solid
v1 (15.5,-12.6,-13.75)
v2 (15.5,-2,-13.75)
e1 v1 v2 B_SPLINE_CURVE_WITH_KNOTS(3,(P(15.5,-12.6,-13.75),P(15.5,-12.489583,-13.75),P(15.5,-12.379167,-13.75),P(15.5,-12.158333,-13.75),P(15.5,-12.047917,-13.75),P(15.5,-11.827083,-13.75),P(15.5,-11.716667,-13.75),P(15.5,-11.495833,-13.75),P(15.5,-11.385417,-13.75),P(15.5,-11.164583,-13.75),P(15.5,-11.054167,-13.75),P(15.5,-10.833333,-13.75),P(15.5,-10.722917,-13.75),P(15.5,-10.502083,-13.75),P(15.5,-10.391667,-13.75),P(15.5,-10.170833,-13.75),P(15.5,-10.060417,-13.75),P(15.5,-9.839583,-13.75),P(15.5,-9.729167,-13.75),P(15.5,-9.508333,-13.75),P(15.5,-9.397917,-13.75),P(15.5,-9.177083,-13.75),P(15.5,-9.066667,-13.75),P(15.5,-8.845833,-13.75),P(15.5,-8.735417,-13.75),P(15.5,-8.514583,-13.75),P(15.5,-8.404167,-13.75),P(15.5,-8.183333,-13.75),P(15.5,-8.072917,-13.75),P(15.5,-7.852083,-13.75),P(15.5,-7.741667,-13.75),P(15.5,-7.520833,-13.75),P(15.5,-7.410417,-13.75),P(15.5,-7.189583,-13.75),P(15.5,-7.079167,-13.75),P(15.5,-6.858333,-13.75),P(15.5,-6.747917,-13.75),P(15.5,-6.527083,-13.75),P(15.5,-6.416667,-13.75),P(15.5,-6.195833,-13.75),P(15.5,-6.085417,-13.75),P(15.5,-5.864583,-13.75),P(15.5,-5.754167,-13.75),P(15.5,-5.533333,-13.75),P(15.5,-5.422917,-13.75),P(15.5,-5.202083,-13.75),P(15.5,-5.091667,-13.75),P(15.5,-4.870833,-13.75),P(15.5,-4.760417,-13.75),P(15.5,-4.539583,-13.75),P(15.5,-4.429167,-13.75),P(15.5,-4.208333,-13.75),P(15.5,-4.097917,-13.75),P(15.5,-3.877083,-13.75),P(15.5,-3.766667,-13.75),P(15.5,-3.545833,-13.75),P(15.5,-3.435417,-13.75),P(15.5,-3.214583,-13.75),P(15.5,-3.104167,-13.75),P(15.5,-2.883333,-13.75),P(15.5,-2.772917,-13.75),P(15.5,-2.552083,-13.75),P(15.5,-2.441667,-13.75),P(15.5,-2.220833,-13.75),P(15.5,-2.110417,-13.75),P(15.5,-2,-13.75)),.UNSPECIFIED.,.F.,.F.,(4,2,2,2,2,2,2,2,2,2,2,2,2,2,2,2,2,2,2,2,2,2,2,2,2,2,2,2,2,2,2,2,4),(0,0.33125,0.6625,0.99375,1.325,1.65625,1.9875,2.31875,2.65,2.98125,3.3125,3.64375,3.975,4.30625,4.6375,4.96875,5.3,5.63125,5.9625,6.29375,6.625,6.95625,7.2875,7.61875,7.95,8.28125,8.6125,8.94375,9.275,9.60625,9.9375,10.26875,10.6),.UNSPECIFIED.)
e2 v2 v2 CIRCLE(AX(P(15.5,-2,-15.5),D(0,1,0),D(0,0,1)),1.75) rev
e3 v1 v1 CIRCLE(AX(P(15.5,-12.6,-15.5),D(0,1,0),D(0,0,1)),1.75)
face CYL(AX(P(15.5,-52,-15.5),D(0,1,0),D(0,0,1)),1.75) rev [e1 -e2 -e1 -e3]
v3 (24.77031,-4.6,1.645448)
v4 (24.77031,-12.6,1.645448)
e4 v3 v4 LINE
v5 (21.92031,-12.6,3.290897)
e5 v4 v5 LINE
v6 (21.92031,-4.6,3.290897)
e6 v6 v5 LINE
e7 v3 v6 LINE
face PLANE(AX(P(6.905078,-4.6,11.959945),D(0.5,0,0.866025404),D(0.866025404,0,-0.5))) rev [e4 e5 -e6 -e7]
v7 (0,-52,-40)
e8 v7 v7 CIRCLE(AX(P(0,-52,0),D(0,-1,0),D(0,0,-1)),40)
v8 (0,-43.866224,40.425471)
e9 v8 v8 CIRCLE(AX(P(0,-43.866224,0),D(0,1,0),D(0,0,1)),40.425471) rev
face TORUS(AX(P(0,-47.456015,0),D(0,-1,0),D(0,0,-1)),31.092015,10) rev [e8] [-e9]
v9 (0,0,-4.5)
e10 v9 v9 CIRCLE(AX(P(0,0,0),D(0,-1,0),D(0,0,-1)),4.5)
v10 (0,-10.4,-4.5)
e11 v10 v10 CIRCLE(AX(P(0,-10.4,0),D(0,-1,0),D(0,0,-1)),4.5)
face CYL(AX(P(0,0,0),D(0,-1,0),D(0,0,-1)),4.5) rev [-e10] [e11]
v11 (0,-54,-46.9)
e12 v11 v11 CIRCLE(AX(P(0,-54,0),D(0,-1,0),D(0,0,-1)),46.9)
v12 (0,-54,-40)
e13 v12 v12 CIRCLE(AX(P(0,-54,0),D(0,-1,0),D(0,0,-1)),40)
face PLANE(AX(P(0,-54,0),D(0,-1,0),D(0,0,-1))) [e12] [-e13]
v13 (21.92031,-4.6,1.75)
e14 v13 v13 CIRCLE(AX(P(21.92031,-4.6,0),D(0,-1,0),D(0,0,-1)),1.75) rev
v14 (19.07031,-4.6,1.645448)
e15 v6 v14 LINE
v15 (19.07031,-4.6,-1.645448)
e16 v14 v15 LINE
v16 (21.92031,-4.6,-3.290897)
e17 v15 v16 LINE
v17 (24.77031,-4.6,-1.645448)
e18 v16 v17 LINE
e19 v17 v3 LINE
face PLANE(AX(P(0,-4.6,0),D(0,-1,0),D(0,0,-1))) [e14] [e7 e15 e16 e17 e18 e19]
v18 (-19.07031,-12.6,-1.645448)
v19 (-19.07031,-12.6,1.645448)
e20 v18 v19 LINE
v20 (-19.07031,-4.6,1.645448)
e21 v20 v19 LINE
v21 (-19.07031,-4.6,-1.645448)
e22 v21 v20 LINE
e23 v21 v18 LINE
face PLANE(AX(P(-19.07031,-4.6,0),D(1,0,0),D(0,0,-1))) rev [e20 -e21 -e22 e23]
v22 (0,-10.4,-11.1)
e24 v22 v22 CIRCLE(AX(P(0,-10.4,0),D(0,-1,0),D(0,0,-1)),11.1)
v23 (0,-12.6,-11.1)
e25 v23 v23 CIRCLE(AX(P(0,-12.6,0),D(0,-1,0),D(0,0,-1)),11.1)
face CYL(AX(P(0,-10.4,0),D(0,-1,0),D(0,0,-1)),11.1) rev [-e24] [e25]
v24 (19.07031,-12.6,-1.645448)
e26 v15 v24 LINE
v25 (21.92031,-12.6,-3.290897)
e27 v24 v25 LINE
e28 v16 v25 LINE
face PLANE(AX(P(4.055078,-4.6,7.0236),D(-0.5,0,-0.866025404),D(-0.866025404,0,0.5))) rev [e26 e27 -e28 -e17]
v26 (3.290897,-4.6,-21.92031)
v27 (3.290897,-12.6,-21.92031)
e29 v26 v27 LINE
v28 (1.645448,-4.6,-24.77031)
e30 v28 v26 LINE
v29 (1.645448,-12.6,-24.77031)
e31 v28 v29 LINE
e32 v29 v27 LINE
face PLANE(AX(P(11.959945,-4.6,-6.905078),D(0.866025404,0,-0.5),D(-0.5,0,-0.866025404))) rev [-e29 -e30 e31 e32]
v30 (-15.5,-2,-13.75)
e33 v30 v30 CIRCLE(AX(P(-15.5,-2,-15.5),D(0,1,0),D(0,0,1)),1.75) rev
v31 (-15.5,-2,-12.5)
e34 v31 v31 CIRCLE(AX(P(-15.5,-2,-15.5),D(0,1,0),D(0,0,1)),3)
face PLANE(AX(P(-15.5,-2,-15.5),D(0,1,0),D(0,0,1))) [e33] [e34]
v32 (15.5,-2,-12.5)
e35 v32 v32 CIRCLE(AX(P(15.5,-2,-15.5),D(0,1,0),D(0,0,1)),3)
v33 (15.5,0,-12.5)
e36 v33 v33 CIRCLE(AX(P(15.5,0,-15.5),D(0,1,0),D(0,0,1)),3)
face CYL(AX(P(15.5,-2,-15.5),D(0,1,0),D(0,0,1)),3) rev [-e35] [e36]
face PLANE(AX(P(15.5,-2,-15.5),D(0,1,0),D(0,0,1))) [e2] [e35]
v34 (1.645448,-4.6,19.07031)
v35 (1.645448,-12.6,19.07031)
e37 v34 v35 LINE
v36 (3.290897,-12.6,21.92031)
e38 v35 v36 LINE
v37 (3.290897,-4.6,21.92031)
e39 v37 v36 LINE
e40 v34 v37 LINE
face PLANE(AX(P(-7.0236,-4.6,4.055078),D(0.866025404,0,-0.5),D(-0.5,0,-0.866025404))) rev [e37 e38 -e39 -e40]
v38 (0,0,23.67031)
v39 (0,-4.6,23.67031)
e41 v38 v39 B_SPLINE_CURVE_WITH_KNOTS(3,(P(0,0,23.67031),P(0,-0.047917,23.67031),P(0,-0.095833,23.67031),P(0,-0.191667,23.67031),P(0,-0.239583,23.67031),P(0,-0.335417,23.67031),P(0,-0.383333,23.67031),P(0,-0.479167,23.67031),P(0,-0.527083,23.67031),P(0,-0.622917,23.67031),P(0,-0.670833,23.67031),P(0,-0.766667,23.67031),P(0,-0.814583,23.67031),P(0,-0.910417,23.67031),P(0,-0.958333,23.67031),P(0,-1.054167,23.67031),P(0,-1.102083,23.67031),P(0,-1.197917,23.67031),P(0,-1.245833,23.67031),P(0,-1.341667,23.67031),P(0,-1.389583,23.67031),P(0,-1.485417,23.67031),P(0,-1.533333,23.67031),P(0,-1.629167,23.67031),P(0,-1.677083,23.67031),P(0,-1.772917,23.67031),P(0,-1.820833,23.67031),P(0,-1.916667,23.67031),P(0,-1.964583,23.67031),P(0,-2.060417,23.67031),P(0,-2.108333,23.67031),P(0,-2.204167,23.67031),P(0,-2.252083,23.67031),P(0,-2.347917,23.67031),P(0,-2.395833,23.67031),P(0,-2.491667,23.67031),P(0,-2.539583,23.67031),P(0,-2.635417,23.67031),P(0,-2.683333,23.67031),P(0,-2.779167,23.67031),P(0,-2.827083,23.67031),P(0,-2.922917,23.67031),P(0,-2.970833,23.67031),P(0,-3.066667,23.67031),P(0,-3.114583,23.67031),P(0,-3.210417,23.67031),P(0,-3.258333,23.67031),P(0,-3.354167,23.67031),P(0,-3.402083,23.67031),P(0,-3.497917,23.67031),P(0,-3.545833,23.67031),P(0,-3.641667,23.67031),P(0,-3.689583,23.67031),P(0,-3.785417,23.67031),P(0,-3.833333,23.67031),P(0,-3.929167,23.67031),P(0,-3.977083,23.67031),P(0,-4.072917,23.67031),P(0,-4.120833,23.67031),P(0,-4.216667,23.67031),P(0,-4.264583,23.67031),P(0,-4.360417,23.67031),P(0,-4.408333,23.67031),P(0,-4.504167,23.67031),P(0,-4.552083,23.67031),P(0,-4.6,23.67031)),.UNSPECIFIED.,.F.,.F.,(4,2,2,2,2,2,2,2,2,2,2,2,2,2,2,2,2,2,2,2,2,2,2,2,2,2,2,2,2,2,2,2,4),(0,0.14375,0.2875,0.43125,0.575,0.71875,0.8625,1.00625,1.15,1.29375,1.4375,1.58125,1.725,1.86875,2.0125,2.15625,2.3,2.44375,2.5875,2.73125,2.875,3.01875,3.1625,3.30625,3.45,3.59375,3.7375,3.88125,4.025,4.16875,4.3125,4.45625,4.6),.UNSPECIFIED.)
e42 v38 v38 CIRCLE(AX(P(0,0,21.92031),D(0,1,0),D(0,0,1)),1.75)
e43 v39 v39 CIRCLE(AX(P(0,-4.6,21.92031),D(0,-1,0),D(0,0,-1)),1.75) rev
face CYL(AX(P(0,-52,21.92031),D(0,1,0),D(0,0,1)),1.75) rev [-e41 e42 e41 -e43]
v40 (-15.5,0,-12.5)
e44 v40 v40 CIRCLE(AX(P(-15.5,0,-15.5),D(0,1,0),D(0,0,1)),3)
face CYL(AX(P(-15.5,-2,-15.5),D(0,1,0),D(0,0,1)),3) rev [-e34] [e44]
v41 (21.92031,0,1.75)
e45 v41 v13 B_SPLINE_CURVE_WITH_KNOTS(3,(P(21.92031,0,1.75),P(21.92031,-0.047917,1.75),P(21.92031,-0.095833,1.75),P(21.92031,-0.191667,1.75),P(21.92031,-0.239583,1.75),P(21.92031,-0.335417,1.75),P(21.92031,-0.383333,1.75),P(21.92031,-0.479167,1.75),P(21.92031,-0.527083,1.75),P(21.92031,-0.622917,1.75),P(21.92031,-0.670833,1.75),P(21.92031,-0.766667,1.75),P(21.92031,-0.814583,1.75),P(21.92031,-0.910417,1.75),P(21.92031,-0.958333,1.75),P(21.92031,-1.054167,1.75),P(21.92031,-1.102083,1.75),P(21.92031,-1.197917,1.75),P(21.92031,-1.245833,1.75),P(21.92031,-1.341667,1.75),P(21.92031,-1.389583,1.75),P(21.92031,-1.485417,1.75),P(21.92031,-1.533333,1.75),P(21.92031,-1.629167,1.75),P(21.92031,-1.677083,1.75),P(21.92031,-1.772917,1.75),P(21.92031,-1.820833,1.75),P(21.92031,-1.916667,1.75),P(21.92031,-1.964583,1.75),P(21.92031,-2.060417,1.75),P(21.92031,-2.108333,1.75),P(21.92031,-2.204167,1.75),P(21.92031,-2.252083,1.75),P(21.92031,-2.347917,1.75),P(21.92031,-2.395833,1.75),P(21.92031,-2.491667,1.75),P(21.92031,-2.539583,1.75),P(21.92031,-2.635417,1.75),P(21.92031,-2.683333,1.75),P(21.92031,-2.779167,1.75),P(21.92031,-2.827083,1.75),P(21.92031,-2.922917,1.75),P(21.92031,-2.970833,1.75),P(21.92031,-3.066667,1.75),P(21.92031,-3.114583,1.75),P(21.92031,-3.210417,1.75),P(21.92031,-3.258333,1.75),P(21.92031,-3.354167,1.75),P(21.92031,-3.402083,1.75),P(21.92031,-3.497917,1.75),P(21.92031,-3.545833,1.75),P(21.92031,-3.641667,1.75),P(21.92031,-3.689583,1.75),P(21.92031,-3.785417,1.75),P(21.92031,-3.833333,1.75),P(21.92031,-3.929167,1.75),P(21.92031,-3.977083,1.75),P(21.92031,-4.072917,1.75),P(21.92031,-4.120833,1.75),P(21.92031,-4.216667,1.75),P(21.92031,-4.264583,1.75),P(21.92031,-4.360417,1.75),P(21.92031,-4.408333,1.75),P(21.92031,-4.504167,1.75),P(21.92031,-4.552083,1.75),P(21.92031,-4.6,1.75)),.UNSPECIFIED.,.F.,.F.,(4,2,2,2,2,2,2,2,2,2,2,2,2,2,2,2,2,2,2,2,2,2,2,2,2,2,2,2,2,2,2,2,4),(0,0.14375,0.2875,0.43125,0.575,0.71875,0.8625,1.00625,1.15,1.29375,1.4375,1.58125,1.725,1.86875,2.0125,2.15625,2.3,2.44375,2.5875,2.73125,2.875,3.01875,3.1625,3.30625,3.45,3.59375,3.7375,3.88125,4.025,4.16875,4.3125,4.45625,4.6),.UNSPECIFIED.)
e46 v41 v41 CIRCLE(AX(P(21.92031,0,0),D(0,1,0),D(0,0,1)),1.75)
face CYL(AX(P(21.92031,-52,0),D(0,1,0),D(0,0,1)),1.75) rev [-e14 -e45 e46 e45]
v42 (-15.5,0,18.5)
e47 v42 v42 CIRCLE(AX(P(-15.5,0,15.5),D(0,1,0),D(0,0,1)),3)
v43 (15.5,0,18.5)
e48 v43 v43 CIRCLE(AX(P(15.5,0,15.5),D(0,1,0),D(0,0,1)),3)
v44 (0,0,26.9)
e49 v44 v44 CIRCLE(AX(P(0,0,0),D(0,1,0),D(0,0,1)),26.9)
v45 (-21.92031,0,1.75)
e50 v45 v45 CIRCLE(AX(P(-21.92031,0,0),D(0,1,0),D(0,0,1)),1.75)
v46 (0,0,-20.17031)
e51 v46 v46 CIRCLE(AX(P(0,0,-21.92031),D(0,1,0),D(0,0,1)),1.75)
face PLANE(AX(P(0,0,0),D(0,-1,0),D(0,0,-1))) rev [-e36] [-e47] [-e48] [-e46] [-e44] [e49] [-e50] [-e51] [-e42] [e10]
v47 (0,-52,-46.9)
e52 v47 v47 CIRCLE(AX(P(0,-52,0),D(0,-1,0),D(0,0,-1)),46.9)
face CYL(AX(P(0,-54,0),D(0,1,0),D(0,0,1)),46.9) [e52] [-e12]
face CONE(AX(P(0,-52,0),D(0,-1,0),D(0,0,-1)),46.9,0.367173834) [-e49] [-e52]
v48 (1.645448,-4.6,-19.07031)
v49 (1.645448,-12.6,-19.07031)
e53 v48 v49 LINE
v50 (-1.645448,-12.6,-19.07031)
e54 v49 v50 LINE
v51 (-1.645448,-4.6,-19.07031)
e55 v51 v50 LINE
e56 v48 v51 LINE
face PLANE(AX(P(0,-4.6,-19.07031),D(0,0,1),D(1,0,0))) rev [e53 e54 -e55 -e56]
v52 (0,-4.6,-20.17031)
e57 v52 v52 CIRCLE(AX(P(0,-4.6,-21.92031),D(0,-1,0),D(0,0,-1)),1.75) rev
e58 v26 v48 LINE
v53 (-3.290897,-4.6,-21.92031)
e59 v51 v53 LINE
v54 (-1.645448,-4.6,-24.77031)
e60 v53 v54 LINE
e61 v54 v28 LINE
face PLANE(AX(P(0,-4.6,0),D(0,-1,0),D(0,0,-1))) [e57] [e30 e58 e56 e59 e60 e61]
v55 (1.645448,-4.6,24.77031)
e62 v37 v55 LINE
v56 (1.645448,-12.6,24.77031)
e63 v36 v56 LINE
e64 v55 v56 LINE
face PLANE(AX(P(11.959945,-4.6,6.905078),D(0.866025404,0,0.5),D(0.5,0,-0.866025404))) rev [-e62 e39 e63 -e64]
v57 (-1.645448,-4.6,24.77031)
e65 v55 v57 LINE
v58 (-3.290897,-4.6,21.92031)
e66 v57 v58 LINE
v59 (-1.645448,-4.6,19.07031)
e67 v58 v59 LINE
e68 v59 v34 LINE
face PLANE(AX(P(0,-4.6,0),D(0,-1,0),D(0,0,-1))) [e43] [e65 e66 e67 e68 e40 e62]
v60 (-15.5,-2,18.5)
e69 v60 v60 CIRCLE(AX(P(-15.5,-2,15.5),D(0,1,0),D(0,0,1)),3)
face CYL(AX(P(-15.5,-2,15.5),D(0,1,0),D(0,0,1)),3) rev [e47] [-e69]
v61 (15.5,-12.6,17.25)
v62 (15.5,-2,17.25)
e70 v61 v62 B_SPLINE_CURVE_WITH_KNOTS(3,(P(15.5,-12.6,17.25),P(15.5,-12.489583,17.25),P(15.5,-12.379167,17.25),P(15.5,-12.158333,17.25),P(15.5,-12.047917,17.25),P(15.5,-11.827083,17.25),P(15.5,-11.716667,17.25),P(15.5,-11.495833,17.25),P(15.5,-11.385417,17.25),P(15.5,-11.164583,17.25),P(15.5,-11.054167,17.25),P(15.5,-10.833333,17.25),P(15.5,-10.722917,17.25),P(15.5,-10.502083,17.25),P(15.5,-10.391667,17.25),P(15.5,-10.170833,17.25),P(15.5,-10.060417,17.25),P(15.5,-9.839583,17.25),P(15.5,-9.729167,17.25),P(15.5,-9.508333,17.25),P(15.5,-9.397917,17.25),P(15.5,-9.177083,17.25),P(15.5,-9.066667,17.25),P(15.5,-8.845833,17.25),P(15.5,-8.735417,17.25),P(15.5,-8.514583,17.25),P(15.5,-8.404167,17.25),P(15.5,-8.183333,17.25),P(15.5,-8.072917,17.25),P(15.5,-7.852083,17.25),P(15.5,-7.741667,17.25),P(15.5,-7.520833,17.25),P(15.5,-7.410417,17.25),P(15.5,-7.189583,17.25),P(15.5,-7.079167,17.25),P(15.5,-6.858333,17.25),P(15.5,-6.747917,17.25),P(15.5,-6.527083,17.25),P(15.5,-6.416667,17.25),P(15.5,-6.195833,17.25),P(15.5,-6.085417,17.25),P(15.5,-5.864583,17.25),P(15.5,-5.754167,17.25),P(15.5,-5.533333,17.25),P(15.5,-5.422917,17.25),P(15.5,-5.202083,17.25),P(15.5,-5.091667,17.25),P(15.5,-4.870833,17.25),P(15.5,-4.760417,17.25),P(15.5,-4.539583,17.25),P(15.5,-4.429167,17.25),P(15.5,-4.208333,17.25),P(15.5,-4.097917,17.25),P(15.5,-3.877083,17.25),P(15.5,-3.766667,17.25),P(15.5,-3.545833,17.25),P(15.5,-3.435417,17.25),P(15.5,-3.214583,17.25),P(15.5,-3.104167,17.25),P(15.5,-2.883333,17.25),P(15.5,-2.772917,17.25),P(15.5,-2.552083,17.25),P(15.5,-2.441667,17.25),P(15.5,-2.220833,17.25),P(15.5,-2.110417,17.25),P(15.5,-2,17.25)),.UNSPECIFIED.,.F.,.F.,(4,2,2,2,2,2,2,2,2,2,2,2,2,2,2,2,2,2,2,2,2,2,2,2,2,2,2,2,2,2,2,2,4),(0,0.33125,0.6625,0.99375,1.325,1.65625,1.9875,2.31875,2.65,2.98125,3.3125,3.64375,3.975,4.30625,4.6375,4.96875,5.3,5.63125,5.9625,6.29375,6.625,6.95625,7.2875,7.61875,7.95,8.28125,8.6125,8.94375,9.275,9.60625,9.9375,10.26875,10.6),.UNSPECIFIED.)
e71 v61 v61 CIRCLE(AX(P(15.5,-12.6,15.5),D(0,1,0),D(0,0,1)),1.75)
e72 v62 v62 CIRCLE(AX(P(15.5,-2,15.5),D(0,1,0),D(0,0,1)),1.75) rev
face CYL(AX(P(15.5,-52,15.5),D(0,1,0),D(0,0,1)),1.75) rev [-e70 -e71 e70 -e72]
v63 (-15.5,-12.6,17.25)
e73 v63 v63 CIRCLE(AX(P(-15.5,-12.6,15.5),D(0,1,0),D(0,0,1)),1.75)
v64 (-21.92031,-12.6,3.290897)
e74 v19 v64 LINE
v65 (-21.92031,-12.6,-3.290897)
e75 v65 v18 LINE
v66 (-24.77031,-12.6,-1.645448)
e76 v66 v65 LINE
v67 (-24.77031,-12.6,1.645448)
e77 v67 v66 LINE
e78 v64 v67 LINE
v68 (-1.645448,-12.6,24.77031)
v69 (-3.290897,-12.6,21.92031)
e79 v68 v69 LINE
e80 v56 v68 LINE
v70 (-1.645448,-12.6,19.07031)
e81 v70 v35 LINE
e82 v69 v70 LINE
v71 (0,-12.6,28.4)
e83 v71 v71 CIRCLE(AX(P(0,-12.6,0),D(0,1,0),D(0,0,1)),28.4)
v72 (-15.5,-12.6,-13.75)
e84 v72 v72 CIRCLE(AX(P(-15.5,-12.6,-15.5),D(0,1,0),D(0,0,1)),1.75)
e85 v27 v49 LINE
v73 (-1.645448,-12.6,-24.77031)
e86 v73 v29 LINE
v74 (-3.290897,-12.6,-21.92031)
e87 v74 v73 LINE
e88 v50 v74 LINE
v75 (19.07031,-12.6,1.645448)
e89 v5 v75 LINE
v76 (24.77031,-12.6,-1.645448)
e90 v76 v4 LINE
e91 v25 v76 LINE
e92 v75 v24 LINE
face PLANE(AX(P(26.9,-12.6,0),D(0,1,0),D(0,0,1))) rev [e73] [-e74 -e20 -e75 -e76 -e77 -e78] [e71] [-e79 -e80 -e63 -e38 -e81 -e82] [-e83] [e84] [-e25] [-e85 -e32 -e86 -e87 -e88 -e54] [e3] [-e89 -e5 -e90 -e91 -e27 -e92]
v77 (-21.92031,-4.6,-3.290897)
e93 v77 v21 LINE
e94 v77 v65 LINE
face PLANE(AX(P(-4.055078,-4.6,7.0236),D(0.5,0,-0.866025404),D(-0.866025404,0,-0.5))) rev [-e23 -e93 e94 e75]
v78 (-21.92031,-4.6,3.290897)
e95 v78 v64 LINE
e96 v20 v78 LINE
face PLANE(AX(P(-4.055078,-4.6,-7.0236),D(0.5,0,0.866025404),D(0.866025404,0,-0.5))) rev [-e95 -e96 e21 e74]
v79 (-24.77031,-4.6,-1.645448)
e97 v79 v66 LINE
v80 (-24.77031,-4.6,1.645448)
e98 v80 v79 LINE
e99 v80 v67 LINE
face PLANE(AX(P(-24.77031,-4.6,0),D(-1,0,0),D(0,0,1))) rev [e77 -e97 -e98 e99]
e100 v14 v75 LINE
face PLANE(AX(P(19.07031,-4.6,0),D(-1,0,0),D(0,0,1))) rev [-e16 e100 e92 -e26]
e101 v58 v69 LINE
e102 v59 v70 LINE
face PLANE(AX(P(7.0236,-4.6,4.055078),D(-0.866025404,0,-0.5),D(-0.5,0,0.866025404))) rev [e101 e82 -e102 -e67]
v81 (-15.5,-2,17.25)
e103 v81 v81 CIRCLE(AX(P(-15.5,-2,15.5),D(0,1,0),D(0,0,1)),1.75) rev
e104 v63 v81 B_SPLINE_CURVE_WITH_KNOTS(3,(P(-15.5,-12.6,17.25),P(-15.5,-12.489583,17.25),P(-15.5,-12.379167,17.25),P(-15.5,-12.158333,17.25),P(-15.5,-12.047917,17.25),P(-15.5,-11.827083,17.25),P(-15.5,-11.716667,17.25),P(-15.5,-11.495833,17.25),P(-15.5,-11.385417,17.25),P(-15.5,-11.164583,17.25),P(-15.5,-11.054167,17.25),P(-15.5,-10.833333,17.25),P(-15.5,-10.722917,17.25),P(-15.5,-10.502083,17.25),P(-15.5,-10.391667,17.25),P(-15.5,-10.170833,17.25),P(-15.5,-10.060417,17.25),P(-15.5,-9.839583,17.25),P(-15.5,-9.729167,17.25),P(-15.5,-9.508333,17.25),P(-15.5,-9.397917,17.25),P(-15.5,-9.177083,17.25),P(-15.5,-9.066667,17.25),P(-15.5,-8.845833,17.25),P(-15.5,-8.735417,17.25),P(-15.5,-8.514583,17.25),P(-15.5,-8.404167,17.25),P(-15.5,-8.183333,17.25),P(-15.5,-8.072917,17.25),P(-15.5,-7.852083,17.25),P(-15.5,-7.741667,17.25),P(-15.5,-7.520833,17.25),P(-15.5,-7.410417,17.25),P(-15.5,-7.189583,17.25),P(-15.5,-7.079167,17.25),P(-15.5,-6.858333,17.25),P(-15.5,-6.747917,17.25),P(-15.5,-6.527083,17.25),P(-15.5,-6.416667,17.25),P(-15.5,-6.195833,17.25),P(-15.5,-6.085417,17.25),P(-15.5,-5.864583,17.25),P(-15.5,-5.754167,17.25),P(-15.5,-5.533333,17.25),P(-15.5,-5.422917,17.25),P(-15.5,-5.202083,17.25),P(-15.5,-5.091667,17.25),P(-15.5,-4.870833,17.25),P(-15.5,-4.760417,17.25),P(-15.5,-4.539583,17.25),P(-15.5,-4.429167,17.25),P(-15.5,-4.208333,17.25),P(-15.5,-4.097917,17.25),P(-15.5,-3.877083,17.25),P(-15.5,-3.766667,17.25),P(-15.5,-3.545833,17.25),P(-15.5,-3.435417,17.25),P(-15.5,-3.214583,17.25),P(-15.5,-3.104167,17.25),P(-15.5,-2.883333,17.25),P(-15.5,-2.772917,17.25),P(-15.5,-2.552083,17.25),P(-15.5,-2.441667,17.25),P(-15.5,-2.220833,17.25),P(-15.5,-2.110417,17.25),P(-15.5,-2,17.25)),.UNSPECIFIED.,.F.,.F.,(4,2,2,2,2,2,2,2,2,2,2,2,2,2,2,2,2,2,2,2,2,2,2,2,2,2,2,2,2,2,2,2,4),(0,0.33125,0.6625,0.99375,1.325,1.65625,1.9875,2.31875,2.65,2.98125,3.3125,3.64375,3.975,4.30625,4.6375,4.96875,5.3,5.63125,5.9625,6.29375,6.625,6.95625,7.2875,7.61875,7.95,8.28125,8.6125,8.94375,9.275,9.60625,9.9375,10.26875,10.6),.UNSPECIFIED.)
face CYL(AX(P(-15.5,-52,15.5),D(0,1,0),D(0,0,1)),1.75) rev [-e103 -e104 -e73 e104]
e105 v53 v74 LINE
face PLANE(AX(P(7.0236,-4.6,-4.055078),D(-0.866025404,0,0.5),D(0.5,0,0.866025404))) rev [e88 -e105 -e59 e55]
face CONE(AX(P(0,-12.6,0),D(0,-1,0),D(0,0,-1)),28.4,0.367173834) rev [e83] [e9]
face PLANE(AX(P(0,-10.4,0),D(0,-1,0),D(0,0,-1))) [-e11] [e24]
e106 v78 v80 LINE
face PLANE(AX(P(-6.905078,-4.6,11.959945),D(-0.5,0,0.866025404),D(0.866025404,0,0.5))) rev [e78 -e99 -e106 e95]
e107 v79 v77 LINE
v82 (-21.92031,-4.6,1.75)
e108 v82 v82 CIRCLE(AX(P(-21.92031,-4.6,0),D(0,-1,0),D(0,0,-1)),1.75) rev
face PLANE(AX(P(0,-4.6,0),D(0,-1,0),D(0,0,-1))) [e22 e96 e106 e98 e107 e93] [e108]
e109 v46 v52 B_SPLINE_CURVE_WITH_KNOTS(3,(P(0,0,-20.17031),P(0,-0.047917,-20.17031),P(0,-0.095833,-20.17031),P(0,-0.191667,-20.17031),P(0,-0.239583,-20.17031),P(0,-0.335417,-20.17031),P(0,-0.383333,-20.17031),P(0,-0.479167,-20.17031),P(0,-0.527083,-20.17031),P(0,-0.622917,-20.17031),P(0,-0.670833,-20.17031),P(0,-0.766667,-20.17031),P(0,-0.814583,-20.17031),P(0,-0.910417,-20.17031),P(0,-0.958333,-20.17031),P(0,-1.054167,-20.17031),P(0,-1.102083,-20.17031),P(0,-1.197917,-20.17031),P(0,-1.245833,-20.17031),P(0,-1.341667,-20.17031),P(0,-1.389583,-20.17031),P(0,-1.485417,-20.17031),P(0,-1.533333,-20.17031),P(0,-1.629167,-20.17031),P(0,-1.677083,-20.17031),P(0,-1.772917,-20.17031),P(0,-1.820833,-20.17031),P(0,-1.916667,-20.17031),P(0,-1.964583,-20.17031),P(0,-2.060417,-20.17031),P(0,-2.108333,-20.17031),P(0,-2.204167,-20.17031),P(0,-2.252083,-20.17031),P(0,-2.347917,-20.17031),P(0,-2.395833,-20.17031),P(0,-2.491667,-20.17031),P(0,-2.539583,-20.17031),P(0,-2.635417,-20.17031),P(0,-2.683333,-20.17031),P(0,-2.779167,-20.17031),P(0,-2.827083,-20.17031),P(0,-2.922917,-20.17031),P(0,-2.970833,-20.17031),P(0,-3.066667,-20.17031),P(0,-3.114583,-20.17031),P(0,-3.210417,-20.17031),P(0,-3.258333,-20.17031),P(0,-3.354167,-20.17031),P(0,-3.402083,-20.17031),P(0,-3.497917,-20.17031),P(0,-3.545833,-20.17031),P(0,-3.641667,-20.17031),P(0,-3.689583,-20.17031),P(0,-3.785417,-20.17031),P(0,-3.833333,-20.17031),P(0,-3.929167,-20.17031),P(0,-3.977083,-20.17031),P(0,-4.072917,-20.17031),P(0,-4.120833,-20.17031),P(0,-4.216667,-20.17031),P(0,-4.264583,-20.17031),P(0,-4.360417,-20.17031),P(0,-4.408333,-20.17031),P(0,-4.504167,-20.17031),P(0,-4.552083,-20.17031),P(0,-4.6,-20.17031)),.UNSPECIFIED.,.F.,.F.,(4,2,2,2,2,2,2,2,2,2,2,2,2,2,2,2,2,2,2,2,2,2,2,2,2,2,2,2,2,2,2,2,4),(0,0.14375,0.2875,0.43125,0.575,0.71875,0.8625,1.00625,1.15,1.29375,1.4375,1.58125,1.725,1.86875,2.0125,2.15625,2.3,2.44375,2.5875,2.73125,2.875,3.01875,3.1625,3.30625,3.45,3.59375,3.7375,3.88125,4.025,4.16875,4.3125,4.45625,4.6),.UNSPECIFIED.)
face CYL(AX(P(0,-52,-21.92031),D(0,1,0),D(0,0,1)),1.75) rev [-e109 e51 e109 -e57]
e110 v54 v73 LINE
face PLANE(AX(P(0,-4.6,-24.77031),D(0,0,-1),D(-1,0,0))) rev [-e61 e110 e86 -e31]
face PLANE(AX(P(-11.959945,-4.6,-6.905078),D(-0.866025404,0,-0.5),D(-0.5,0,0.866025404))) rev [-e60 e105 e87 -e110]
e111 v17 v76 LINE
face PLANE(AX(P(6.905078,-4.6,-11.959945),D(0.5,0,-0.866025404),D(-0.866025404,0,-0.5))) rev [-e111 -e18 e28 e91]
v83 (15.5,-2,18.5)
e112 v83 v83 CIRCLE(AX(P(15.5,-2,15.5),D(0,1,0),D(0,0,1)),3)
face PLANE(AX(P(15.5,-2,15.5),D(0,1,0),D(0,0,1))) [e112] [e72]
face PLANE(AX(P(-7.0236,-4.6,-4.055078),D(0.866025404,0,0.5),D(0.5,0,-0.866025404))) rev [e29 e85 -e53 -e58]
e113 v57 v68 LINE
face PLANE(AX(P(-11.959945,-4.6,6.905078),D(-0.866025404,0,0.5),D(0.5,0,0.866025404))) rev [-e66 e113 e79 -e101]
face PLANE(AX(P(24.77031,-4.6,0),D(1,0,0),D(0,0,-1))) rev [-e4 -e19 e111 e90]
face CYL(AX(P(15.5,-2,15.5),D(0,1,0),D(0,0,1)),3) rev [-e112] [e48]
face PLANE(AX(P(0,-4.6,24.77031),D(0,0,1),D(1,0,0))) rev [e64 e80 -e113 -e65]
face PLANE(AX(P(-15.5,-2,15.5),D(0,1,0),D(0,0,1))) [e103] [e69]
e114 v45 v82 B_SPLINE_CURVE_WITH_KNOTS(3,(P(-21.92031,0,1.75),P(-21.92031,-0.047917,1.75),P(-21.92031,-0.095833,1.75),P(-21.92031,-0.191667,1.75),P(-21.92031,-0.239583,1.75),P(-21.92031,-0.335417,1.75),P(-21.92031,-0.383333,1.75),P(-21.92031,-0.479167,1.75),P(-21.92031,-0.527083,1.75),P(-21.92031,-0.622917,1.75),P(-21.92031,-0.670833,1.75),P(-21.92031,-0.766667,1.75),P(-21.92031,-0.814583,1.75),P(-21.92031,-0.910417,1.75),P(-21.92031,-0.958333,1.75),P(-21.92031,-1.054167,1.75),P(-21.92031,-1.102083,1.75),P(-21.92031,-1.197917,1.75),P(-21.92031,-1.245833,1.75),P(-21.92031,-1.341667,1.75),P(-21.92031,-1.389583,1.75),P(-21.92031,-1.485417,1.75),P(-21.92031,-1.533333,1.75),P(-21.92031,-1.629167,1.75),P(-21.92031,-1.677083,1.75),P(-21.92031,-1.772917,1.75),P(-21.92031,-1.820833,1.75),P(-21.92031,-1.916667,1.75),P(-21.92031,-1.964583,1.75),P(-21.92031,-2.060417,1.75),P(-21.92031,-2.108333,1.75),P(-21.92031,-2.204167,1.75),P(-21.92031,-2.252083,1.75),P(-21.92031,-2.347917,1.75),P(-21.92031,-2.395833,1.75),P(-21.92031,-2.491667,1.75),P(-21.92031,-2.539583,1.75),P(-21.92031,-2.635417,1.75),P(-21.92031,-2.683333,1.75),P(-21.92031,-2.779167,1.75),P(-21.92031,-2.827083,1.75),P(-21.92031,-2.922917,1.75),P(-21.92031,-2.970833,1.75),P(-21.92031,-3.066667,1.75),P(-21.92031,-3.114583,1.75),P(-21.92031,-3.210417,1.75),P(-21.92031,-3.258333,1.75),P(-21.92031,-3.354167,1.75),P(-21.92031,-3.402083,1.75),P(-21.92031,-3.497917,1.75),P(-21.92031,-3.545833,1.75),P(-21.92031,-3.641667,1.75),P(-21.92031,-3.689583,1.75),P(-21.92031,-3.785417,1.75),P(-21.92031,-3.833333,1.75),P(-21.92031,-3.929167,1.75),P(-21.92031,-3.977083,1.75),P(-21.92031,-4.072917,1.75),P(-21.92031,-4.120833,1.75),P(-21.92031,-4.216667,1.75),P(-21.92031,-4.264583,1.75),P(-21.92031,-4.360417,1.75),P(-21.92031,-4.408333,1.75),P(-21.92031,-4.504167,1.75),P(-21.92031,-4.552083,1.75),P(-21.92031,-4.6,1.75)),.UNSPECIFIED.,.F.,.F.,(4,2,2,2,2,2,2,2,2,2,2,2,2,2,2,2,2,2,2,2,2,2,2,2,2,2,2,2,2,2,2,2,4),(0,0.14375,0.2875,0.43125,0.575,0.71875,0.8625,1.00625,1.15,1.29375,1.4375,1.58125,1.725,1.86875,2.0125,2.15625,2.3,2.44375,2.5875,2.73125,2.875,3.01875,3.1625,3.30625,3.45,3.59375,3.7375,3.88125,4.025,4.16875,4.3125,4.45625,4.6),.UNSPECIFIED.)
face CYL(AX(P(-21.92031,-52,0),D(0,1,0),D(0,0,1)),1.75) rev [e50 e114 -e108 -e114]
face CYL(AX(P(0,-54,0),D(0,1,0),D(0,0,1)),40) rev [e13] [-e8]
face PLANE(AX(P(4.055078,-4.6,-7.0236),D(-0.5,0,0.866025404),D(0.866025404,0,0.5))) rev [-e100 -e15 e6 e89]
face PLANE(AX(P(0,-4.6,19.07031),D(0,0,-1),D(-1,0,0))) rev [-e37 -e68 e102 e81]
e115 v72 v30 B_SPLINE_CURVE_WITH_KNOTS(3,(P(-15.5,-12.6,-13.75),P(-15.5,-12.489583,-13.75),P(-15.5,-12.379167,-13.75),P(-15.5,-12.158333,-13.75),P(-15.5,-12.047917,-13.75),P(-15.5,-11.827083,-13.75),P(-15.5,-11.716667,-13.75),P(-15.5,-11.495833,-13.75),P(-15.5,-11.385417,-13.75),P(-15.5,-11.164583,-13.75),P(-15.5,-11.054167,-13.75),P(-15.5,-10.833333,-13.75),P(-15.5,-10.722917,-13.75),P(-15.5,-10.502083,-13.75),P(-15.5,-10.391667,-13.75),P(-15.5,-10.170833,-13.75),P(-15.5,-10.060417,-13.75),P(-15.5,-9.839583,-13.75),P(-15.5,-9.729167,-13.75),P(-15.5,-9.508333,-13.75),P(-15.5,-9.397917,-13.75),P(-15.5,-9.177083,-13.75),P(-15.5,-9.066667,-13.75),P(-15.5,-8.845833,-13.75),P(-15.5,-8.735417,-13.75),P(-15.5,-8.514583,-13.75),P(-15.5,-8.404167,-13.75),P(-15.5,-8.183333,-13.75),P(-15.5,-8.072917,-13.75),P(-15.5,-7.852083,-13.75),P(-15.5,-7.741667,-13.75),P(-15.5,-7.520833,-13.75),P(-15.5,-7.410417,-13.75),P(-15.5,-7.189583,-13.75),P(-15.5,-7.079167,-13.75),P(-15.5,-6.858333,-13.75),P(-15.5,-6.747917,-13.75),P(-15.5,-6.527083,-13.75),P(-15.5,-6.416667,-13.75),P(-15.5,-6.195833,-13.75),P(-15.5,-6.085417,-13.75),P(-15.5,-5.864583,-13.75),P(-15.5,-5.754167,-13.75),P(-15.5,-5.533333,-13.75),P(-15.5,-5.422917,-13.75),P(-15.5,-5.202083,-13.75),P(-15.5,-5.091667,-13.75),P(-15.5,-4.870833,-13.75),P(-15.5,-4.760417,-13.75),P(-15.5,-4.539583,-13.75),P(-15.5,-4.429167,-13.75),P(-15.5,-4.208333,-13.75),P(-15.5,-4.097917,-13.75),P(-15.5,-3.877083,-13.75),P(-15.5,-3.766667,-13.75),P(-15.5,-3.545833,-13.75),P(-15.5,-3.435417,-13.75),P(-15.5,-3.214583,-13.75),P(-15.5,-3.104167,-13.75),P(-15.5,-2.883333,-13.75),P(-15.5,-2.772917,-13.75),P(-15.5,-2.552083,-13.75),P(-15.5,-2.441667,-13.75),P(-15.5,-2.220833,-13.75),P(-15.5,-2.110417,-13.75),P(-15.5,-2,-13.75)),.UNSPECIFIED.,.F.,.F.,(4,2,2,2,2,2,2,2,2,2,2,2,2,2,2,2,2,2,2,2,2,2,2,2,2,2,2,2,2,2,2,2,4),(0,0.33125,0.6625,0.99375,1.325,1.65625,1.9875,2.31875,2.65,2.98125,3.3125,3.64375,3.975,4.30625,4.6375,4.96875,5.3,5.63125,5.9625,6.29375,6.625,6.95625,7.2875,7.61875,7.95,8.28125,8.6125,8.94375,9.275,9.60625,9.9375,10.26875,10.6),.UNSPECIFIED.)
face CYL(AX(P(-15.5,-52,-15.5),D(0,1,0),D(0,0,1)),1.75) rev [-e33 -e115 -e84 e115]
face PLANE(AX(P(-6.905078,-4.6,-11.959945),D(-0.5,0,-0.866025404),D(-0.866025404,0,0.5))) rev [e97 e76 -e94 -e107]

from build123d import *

# Parameters (mm, degrees)
SKETCH_2_R          = 1.75
CUT_EXTRUDE_1_DEPTH = 85.280602751
CUT_EXTRUDE_2_DEPTH = 8
SKETCH_4_R          = 3
CUT_EXTRUDE_3_DEPTH = 2
SKETCH_5_R          = 11.1
CUT_EXTRUDE_4_DEPTH = 2.2
SKETCH_6_R          = 4.5
CUT_EXTRUDE_5_DEPTH = 79.292911557
SKETCH_7_R          = 46.9
SKETCH_7_R_2        = 40
EXTRUDE_1_DEPTH     = 2


with BuildPart() as part:
    # 草图1 → 旋转1 (revolve)
    with BuildSketch(Plane.XY, mode=Mode.PRIVATE) as revolve_1_sk:
        Polygon((0, 0), (26.9, 0), (46.9, -52), (43.553846154, -52), (28.4, -12.6), (26.9, -12.6), (0, -12.6), align=None)
    revolve(revolve_1_sk.sketch.rotate(Axis((0, 0, 0), (0, -1, 0)), 90), axis=Axis((0, 0, 0), (0, -1, 0)))

    # 草图2 → 切除-拉伸1 (cut, through all)
    with BuildSketch(Plane(origin=(0, 0, 0), x_dir=(1, 0, 0), z_dir=(0, 1, 0))):
        with BuildLine():
            Line((-15.5, 13.75), (-15.5, 15.5))
            Line((-15.5, 15.5), (-13.75, 15.5))
            ThreePointArc((-13.75, 15.5), (-16.737436867, 16.737436867), (-15.5, 13.75))
        make_face()
        with BuildLine():
            Line((-13.75, 15.5), (-15.5, 15.5))
            Line((-15.5, 15.5), (-15.5, 13.75))
            ThreePointArc((-15.5, 13.75), (-14.262563133, 14.262563133), (-13.75, 15.5))
        make_face()
        with BuildLine():
            Line((-15.5, 13.75), (-15.5, 15.5))
            Line((-15.5, 15.5), (-13.75, 15.5))
            ThreePointArc((-13.75, 15.5), (-16.737436867, 16.737436867), (-15.5, 13.75))
        make_face()
        with BuildLine():
            Line((-13.75, 15.5), (-15.5, 15.5))
            Line((-15.5, 15.5), (-15.5, 13.75))
            ThreePointArc((-15.5, 13.75), (-14.262563133, 14.262563133), (-13.75, 15.5))
        make_face()
        with BuildLine():
            ThreePointArc((17.25, 15.5), (15.5, 17.25), (13.75, 15.5))
            Line((13.75, 15.5), (15.5, 15.5))
            Line((15.5, 15.5), (15.5, 13.75))
            ThreePointArc((15.5, 13.75), (16.737436867, 14.262563133), (17.25, 15.5))
        make_face()
        with BuildLine():
            Line((15.5, 15.5), (13.75, 15.5))
            ThreePointArc((13.75, 15.5), (14.262563133, 14.262563133), (15.5, 13.75))
            Line((15.5, 13.75), (15.5, 15.5))
        make_face()
        with BuildLine():
            ThreePointArc((17.25, 15.5), (15.5, 17.25), (13.75, 15.5))
            Line((13.75, 15.5), (15.5, 15.5))
            Line((15.5, 15.5), (15.5, 13.75))
            ThreePointArc((15.5, 13.75), (16.737436867, 14.262563133), (17.25, 15.5))
        make_face()
        with BuildLine():
            Line((15.5, 15.5), (13.75, 15.5))
            ThreePointArc((13.75, 15.5), (14.262563133, 14.262563133), (15.5, 13.75))
            Line((15.5, 13.75), (15.5, 15.5))
        make_face()
        with BuildLine():
            ThreePointArc((17.25, -15.5), (16.737436867, -14.262563133), (15.5, -13.75))
            Line((15.5, -13.75), (15.5, -15.5))
            Line((15.5, -15.5), (13.75, -15.5))
            ThreePointArc((13.75, -15.5), (15.5, -17.25), (17.25, -15.5))
        make_face()
        with BuildLine():
            Line((15.5, -15.5), (15.5, -13.75))
            ThreePointArc((15.5, -13.75), (14.262563133, -14.262563133), (13.75, -15.5))
            Line((13.75, -15.5), (15.5, -15.5))
        make_face()
        with BuildLine():
            ThreePointArc((17.25, -15.5), (16.737436867, -14.262563133), (15.5, -13.75))
            Line((15.5, -13.75), (15.5, -15.5))
            Line((15.5, -15.5), (13.75, -15.5))
            ThreePointArc((13.75, -15.5), (15.5, -17.25), (17.25, -15.5))
        make_face()
        with BuildLine():
            Line((15.5, -15.5), (15.5, -13.75))
            ThreePointArc((15.5, -13.75), (14.262563133, -14.262563133), (13.75, -15.5))
            Line((13.75, -15.5), (15.5, -15.5))
        make_face()
        with BuildLine():
            ThreePointArc((-13.75, -15.5), (-14.262563133, -14.262563133), (-15.5, -13.75))
            Line((-15.5, -13.75), (-15.5, -15.5))
            Line((-15.5, -15.5), (-13.75, -15.5))
        make_face()
        with BuildLine():
            Line((-15.5, -15.5), (-15.5, -13.75))
            ThreePointArc((-15.5, -13.75), (-16.737436867, -16.737436867), (-13.75, -15.5))
            Line((-13.75, -15.5), (-15.5, -15.5))
        make_face()
        with BuildLine():
            ThreePointArc((-13.75, -15.5), (-14.262563133, -14.262563133), (-15.5, -13.75))
            Line((-15.5, -13.75), (-15.5, -15.5))
            Line((-15.5, -15.5), (-13.75, -15.5))
        make_face()
        with BuildLine():
            Line((-15.5, -15.5), (-15.5, -13.75))
            ThreePointArc((-15.5, -13.75), (-16.737436867, -16.737436867), (-13.75, -15.5))
            Line((-13.75, -15.5), (-15.5, -15.5))
        make_face()
        with Locations(Location((0, 21.920310217, 0), (0, 0, 270))):
            Circle(SKETCH_2_R)
        with Locations(Location((-21.920310217, 0, 0), (0, 0, 270))):
            Circle(SKETCH_2_R)
        with Locations(Location((21.920310217, 0, 0), (0, 0, 270))):
            Circle(SKETCH_2_R)
        with Locations(Location((0, -21.920310217, 0), (0, 0, 270))):
            Circle(SKETCH_2_R)
    extrude(amount=-CUT_EXTRUDE_1_DEPTH, mode=Mode.SUBTRACT)

    # 草图3 → 切除-拉伸2 (cut)
    with BuildSketch(Plane.XZ.offset(12.6)):
        Polygon((2.086344802, -19.833965415), (0, -21.920310217), (-2.086344802, -19.833965415), (-3.290896534, -21.920310217), (-1.645448267, -24.770310217), (1.645448267, -24.770310217), (3.290896534, -21.920310217), align=None)
        Polygon((-2.086344802, -19.833965415), (0, -21.920310217), (2.086344802, -19.833965415), (1.645448267, -19.070310217), (-1.645448267, -19.070310217), align=None)
        Polygon((21.920310217, 0), (19.833965415, -2.086344802), (21.920310217, -3.290896534), (24.770310217, -1.645448267), (24.770310217, 1.645448267), (21.920310217, 3.290896534), (19.833965415, 2.086344802), align=None)
        Polygon((19.070310217, -1.645448267), (19.833965415, -2.086344802), (21.920310217, 0), (19.833965415, 2.086344802), (19.070310217, 1.645448267), align=None)
        Polygon((-3.290896534, 21.920310217), (-2.086344802, 19.833965415), (0, 21.920310217), (2.086344802, 19.833965415), (3.290896534, 21.920310217), (1.645448267, 24.770310217), (-1.645448267, 24.770310217), align=None)
        Polygon((0, 21.920310217), (-2.086344802, 19.833965415), (-1.645448267, 19.070310217), (1.645448267, 19.070310217), (2.086344802, 19.833965415), align=None)
        Polygon((-21.920310217, -3.290896534), (-19.833965415, -2.086344802), (-21.920310217, 0), (-19.833965415, 2.086344802), (-21.920310217, 3.290896534), (-24.770310217, 1.645448267), (-24.770310217, -1.645448267), align=None)
        Polygon((-21.920310217, 0), (-19.833965415, -2.086344802), (-19.070310217, -1.645448267), (-19.070310217, 1.645448267), (-19.833965415, 2.086344802), align=None)
    extrude(amount=-CUT_EXTRUDE_2_DEPTH, mode=Mode.SUBTRACT)

    # 草图4 → 切除-拉伸3 (cut)
    with BuildSketch(Plane(origin=(0, 0, 0), x_dir=(1, 0, 0), z_dir=(0, 1, 0))):
        with Locations(Location((-15.5, -15.5, 0), (0, 0, 270))):
            Circle(SKETCH_4_R)
        with Locations(Location((-15.5, 15.5, 0), (0, 0, 270))):
            Circle(SKETCH_4_R)
        with Locations(Location((15.5, 15.5, 0), (0, 0, 270))):
            Circle(SKETCH_4_R)
        with Locations(Location((15.5, -15.5, 0), (0, 0, 270))):
            Circle(SKETCH_4_R)
    extrude(amount=-CUT_EXTRUDE_3_DEPTH, mode=Mode.SUBTRACT)

    # 草图5 → 切除-拉伸4 (cut)
    with BuildSketch(Plane.XZ.offset(12.6)):
        with Locations(Location((0, 0, 0), (0, 0, 270))):
            Circle(SKETCH_5_R)
    extrude(amount=-CUT_EXTRUDE_4_DEPTH, mode=Mode.SUBTRACT)

    # 草图6 → 切除-拉伸5 (cut, through all)
    with BuildSketch(Plane.XZ.offset(10.4)):
        with Locations(Location((0, 0, 0), (0, 0, 270))):
            Circle(SKETCH_6_R)
    extrude(amount=-CUT_EXTRUDE_5_DEPTH, mode=Mode.SUBTRACT)

    # 草图7 → 凸台-拉伸1 (add)
    with BuildSketch(Plane.XZ.offset(52)):
        with Locations(Location((0, 0, 0), (0, 0, 270))):
            Circle(SKETCH_7_R)
        with Locations(Location((0, 0, 0), (0, 0, 270))):
            Circle(SKETCH_7_R_2, mode=Mode.SUBTRACT)
    extrude(amount=EXTRUDE_1_DEPTH)

    # 圆角1: read off the stored shape, not the designer's step
    # 圆角1 outline → 圆角1 (revolve)
    with BuildSketch(Plane.XY):
        with BuildLine():
            Line((43.553846154, -43.866224222), (40.425470855, -43.866224222))
            ThreePointArc((40.425470855, -43.866224222), (41.078361572, -47.978392274), (40, -52))
            Line((40, -52), (43.553846154, -52))
            Line((43.553846154, -52), (43.553846154, -43.866224222))
        make_face()
    revolve(axis=Axis((0, 0, 0), (0, 1, 0)))


solid = part.part
